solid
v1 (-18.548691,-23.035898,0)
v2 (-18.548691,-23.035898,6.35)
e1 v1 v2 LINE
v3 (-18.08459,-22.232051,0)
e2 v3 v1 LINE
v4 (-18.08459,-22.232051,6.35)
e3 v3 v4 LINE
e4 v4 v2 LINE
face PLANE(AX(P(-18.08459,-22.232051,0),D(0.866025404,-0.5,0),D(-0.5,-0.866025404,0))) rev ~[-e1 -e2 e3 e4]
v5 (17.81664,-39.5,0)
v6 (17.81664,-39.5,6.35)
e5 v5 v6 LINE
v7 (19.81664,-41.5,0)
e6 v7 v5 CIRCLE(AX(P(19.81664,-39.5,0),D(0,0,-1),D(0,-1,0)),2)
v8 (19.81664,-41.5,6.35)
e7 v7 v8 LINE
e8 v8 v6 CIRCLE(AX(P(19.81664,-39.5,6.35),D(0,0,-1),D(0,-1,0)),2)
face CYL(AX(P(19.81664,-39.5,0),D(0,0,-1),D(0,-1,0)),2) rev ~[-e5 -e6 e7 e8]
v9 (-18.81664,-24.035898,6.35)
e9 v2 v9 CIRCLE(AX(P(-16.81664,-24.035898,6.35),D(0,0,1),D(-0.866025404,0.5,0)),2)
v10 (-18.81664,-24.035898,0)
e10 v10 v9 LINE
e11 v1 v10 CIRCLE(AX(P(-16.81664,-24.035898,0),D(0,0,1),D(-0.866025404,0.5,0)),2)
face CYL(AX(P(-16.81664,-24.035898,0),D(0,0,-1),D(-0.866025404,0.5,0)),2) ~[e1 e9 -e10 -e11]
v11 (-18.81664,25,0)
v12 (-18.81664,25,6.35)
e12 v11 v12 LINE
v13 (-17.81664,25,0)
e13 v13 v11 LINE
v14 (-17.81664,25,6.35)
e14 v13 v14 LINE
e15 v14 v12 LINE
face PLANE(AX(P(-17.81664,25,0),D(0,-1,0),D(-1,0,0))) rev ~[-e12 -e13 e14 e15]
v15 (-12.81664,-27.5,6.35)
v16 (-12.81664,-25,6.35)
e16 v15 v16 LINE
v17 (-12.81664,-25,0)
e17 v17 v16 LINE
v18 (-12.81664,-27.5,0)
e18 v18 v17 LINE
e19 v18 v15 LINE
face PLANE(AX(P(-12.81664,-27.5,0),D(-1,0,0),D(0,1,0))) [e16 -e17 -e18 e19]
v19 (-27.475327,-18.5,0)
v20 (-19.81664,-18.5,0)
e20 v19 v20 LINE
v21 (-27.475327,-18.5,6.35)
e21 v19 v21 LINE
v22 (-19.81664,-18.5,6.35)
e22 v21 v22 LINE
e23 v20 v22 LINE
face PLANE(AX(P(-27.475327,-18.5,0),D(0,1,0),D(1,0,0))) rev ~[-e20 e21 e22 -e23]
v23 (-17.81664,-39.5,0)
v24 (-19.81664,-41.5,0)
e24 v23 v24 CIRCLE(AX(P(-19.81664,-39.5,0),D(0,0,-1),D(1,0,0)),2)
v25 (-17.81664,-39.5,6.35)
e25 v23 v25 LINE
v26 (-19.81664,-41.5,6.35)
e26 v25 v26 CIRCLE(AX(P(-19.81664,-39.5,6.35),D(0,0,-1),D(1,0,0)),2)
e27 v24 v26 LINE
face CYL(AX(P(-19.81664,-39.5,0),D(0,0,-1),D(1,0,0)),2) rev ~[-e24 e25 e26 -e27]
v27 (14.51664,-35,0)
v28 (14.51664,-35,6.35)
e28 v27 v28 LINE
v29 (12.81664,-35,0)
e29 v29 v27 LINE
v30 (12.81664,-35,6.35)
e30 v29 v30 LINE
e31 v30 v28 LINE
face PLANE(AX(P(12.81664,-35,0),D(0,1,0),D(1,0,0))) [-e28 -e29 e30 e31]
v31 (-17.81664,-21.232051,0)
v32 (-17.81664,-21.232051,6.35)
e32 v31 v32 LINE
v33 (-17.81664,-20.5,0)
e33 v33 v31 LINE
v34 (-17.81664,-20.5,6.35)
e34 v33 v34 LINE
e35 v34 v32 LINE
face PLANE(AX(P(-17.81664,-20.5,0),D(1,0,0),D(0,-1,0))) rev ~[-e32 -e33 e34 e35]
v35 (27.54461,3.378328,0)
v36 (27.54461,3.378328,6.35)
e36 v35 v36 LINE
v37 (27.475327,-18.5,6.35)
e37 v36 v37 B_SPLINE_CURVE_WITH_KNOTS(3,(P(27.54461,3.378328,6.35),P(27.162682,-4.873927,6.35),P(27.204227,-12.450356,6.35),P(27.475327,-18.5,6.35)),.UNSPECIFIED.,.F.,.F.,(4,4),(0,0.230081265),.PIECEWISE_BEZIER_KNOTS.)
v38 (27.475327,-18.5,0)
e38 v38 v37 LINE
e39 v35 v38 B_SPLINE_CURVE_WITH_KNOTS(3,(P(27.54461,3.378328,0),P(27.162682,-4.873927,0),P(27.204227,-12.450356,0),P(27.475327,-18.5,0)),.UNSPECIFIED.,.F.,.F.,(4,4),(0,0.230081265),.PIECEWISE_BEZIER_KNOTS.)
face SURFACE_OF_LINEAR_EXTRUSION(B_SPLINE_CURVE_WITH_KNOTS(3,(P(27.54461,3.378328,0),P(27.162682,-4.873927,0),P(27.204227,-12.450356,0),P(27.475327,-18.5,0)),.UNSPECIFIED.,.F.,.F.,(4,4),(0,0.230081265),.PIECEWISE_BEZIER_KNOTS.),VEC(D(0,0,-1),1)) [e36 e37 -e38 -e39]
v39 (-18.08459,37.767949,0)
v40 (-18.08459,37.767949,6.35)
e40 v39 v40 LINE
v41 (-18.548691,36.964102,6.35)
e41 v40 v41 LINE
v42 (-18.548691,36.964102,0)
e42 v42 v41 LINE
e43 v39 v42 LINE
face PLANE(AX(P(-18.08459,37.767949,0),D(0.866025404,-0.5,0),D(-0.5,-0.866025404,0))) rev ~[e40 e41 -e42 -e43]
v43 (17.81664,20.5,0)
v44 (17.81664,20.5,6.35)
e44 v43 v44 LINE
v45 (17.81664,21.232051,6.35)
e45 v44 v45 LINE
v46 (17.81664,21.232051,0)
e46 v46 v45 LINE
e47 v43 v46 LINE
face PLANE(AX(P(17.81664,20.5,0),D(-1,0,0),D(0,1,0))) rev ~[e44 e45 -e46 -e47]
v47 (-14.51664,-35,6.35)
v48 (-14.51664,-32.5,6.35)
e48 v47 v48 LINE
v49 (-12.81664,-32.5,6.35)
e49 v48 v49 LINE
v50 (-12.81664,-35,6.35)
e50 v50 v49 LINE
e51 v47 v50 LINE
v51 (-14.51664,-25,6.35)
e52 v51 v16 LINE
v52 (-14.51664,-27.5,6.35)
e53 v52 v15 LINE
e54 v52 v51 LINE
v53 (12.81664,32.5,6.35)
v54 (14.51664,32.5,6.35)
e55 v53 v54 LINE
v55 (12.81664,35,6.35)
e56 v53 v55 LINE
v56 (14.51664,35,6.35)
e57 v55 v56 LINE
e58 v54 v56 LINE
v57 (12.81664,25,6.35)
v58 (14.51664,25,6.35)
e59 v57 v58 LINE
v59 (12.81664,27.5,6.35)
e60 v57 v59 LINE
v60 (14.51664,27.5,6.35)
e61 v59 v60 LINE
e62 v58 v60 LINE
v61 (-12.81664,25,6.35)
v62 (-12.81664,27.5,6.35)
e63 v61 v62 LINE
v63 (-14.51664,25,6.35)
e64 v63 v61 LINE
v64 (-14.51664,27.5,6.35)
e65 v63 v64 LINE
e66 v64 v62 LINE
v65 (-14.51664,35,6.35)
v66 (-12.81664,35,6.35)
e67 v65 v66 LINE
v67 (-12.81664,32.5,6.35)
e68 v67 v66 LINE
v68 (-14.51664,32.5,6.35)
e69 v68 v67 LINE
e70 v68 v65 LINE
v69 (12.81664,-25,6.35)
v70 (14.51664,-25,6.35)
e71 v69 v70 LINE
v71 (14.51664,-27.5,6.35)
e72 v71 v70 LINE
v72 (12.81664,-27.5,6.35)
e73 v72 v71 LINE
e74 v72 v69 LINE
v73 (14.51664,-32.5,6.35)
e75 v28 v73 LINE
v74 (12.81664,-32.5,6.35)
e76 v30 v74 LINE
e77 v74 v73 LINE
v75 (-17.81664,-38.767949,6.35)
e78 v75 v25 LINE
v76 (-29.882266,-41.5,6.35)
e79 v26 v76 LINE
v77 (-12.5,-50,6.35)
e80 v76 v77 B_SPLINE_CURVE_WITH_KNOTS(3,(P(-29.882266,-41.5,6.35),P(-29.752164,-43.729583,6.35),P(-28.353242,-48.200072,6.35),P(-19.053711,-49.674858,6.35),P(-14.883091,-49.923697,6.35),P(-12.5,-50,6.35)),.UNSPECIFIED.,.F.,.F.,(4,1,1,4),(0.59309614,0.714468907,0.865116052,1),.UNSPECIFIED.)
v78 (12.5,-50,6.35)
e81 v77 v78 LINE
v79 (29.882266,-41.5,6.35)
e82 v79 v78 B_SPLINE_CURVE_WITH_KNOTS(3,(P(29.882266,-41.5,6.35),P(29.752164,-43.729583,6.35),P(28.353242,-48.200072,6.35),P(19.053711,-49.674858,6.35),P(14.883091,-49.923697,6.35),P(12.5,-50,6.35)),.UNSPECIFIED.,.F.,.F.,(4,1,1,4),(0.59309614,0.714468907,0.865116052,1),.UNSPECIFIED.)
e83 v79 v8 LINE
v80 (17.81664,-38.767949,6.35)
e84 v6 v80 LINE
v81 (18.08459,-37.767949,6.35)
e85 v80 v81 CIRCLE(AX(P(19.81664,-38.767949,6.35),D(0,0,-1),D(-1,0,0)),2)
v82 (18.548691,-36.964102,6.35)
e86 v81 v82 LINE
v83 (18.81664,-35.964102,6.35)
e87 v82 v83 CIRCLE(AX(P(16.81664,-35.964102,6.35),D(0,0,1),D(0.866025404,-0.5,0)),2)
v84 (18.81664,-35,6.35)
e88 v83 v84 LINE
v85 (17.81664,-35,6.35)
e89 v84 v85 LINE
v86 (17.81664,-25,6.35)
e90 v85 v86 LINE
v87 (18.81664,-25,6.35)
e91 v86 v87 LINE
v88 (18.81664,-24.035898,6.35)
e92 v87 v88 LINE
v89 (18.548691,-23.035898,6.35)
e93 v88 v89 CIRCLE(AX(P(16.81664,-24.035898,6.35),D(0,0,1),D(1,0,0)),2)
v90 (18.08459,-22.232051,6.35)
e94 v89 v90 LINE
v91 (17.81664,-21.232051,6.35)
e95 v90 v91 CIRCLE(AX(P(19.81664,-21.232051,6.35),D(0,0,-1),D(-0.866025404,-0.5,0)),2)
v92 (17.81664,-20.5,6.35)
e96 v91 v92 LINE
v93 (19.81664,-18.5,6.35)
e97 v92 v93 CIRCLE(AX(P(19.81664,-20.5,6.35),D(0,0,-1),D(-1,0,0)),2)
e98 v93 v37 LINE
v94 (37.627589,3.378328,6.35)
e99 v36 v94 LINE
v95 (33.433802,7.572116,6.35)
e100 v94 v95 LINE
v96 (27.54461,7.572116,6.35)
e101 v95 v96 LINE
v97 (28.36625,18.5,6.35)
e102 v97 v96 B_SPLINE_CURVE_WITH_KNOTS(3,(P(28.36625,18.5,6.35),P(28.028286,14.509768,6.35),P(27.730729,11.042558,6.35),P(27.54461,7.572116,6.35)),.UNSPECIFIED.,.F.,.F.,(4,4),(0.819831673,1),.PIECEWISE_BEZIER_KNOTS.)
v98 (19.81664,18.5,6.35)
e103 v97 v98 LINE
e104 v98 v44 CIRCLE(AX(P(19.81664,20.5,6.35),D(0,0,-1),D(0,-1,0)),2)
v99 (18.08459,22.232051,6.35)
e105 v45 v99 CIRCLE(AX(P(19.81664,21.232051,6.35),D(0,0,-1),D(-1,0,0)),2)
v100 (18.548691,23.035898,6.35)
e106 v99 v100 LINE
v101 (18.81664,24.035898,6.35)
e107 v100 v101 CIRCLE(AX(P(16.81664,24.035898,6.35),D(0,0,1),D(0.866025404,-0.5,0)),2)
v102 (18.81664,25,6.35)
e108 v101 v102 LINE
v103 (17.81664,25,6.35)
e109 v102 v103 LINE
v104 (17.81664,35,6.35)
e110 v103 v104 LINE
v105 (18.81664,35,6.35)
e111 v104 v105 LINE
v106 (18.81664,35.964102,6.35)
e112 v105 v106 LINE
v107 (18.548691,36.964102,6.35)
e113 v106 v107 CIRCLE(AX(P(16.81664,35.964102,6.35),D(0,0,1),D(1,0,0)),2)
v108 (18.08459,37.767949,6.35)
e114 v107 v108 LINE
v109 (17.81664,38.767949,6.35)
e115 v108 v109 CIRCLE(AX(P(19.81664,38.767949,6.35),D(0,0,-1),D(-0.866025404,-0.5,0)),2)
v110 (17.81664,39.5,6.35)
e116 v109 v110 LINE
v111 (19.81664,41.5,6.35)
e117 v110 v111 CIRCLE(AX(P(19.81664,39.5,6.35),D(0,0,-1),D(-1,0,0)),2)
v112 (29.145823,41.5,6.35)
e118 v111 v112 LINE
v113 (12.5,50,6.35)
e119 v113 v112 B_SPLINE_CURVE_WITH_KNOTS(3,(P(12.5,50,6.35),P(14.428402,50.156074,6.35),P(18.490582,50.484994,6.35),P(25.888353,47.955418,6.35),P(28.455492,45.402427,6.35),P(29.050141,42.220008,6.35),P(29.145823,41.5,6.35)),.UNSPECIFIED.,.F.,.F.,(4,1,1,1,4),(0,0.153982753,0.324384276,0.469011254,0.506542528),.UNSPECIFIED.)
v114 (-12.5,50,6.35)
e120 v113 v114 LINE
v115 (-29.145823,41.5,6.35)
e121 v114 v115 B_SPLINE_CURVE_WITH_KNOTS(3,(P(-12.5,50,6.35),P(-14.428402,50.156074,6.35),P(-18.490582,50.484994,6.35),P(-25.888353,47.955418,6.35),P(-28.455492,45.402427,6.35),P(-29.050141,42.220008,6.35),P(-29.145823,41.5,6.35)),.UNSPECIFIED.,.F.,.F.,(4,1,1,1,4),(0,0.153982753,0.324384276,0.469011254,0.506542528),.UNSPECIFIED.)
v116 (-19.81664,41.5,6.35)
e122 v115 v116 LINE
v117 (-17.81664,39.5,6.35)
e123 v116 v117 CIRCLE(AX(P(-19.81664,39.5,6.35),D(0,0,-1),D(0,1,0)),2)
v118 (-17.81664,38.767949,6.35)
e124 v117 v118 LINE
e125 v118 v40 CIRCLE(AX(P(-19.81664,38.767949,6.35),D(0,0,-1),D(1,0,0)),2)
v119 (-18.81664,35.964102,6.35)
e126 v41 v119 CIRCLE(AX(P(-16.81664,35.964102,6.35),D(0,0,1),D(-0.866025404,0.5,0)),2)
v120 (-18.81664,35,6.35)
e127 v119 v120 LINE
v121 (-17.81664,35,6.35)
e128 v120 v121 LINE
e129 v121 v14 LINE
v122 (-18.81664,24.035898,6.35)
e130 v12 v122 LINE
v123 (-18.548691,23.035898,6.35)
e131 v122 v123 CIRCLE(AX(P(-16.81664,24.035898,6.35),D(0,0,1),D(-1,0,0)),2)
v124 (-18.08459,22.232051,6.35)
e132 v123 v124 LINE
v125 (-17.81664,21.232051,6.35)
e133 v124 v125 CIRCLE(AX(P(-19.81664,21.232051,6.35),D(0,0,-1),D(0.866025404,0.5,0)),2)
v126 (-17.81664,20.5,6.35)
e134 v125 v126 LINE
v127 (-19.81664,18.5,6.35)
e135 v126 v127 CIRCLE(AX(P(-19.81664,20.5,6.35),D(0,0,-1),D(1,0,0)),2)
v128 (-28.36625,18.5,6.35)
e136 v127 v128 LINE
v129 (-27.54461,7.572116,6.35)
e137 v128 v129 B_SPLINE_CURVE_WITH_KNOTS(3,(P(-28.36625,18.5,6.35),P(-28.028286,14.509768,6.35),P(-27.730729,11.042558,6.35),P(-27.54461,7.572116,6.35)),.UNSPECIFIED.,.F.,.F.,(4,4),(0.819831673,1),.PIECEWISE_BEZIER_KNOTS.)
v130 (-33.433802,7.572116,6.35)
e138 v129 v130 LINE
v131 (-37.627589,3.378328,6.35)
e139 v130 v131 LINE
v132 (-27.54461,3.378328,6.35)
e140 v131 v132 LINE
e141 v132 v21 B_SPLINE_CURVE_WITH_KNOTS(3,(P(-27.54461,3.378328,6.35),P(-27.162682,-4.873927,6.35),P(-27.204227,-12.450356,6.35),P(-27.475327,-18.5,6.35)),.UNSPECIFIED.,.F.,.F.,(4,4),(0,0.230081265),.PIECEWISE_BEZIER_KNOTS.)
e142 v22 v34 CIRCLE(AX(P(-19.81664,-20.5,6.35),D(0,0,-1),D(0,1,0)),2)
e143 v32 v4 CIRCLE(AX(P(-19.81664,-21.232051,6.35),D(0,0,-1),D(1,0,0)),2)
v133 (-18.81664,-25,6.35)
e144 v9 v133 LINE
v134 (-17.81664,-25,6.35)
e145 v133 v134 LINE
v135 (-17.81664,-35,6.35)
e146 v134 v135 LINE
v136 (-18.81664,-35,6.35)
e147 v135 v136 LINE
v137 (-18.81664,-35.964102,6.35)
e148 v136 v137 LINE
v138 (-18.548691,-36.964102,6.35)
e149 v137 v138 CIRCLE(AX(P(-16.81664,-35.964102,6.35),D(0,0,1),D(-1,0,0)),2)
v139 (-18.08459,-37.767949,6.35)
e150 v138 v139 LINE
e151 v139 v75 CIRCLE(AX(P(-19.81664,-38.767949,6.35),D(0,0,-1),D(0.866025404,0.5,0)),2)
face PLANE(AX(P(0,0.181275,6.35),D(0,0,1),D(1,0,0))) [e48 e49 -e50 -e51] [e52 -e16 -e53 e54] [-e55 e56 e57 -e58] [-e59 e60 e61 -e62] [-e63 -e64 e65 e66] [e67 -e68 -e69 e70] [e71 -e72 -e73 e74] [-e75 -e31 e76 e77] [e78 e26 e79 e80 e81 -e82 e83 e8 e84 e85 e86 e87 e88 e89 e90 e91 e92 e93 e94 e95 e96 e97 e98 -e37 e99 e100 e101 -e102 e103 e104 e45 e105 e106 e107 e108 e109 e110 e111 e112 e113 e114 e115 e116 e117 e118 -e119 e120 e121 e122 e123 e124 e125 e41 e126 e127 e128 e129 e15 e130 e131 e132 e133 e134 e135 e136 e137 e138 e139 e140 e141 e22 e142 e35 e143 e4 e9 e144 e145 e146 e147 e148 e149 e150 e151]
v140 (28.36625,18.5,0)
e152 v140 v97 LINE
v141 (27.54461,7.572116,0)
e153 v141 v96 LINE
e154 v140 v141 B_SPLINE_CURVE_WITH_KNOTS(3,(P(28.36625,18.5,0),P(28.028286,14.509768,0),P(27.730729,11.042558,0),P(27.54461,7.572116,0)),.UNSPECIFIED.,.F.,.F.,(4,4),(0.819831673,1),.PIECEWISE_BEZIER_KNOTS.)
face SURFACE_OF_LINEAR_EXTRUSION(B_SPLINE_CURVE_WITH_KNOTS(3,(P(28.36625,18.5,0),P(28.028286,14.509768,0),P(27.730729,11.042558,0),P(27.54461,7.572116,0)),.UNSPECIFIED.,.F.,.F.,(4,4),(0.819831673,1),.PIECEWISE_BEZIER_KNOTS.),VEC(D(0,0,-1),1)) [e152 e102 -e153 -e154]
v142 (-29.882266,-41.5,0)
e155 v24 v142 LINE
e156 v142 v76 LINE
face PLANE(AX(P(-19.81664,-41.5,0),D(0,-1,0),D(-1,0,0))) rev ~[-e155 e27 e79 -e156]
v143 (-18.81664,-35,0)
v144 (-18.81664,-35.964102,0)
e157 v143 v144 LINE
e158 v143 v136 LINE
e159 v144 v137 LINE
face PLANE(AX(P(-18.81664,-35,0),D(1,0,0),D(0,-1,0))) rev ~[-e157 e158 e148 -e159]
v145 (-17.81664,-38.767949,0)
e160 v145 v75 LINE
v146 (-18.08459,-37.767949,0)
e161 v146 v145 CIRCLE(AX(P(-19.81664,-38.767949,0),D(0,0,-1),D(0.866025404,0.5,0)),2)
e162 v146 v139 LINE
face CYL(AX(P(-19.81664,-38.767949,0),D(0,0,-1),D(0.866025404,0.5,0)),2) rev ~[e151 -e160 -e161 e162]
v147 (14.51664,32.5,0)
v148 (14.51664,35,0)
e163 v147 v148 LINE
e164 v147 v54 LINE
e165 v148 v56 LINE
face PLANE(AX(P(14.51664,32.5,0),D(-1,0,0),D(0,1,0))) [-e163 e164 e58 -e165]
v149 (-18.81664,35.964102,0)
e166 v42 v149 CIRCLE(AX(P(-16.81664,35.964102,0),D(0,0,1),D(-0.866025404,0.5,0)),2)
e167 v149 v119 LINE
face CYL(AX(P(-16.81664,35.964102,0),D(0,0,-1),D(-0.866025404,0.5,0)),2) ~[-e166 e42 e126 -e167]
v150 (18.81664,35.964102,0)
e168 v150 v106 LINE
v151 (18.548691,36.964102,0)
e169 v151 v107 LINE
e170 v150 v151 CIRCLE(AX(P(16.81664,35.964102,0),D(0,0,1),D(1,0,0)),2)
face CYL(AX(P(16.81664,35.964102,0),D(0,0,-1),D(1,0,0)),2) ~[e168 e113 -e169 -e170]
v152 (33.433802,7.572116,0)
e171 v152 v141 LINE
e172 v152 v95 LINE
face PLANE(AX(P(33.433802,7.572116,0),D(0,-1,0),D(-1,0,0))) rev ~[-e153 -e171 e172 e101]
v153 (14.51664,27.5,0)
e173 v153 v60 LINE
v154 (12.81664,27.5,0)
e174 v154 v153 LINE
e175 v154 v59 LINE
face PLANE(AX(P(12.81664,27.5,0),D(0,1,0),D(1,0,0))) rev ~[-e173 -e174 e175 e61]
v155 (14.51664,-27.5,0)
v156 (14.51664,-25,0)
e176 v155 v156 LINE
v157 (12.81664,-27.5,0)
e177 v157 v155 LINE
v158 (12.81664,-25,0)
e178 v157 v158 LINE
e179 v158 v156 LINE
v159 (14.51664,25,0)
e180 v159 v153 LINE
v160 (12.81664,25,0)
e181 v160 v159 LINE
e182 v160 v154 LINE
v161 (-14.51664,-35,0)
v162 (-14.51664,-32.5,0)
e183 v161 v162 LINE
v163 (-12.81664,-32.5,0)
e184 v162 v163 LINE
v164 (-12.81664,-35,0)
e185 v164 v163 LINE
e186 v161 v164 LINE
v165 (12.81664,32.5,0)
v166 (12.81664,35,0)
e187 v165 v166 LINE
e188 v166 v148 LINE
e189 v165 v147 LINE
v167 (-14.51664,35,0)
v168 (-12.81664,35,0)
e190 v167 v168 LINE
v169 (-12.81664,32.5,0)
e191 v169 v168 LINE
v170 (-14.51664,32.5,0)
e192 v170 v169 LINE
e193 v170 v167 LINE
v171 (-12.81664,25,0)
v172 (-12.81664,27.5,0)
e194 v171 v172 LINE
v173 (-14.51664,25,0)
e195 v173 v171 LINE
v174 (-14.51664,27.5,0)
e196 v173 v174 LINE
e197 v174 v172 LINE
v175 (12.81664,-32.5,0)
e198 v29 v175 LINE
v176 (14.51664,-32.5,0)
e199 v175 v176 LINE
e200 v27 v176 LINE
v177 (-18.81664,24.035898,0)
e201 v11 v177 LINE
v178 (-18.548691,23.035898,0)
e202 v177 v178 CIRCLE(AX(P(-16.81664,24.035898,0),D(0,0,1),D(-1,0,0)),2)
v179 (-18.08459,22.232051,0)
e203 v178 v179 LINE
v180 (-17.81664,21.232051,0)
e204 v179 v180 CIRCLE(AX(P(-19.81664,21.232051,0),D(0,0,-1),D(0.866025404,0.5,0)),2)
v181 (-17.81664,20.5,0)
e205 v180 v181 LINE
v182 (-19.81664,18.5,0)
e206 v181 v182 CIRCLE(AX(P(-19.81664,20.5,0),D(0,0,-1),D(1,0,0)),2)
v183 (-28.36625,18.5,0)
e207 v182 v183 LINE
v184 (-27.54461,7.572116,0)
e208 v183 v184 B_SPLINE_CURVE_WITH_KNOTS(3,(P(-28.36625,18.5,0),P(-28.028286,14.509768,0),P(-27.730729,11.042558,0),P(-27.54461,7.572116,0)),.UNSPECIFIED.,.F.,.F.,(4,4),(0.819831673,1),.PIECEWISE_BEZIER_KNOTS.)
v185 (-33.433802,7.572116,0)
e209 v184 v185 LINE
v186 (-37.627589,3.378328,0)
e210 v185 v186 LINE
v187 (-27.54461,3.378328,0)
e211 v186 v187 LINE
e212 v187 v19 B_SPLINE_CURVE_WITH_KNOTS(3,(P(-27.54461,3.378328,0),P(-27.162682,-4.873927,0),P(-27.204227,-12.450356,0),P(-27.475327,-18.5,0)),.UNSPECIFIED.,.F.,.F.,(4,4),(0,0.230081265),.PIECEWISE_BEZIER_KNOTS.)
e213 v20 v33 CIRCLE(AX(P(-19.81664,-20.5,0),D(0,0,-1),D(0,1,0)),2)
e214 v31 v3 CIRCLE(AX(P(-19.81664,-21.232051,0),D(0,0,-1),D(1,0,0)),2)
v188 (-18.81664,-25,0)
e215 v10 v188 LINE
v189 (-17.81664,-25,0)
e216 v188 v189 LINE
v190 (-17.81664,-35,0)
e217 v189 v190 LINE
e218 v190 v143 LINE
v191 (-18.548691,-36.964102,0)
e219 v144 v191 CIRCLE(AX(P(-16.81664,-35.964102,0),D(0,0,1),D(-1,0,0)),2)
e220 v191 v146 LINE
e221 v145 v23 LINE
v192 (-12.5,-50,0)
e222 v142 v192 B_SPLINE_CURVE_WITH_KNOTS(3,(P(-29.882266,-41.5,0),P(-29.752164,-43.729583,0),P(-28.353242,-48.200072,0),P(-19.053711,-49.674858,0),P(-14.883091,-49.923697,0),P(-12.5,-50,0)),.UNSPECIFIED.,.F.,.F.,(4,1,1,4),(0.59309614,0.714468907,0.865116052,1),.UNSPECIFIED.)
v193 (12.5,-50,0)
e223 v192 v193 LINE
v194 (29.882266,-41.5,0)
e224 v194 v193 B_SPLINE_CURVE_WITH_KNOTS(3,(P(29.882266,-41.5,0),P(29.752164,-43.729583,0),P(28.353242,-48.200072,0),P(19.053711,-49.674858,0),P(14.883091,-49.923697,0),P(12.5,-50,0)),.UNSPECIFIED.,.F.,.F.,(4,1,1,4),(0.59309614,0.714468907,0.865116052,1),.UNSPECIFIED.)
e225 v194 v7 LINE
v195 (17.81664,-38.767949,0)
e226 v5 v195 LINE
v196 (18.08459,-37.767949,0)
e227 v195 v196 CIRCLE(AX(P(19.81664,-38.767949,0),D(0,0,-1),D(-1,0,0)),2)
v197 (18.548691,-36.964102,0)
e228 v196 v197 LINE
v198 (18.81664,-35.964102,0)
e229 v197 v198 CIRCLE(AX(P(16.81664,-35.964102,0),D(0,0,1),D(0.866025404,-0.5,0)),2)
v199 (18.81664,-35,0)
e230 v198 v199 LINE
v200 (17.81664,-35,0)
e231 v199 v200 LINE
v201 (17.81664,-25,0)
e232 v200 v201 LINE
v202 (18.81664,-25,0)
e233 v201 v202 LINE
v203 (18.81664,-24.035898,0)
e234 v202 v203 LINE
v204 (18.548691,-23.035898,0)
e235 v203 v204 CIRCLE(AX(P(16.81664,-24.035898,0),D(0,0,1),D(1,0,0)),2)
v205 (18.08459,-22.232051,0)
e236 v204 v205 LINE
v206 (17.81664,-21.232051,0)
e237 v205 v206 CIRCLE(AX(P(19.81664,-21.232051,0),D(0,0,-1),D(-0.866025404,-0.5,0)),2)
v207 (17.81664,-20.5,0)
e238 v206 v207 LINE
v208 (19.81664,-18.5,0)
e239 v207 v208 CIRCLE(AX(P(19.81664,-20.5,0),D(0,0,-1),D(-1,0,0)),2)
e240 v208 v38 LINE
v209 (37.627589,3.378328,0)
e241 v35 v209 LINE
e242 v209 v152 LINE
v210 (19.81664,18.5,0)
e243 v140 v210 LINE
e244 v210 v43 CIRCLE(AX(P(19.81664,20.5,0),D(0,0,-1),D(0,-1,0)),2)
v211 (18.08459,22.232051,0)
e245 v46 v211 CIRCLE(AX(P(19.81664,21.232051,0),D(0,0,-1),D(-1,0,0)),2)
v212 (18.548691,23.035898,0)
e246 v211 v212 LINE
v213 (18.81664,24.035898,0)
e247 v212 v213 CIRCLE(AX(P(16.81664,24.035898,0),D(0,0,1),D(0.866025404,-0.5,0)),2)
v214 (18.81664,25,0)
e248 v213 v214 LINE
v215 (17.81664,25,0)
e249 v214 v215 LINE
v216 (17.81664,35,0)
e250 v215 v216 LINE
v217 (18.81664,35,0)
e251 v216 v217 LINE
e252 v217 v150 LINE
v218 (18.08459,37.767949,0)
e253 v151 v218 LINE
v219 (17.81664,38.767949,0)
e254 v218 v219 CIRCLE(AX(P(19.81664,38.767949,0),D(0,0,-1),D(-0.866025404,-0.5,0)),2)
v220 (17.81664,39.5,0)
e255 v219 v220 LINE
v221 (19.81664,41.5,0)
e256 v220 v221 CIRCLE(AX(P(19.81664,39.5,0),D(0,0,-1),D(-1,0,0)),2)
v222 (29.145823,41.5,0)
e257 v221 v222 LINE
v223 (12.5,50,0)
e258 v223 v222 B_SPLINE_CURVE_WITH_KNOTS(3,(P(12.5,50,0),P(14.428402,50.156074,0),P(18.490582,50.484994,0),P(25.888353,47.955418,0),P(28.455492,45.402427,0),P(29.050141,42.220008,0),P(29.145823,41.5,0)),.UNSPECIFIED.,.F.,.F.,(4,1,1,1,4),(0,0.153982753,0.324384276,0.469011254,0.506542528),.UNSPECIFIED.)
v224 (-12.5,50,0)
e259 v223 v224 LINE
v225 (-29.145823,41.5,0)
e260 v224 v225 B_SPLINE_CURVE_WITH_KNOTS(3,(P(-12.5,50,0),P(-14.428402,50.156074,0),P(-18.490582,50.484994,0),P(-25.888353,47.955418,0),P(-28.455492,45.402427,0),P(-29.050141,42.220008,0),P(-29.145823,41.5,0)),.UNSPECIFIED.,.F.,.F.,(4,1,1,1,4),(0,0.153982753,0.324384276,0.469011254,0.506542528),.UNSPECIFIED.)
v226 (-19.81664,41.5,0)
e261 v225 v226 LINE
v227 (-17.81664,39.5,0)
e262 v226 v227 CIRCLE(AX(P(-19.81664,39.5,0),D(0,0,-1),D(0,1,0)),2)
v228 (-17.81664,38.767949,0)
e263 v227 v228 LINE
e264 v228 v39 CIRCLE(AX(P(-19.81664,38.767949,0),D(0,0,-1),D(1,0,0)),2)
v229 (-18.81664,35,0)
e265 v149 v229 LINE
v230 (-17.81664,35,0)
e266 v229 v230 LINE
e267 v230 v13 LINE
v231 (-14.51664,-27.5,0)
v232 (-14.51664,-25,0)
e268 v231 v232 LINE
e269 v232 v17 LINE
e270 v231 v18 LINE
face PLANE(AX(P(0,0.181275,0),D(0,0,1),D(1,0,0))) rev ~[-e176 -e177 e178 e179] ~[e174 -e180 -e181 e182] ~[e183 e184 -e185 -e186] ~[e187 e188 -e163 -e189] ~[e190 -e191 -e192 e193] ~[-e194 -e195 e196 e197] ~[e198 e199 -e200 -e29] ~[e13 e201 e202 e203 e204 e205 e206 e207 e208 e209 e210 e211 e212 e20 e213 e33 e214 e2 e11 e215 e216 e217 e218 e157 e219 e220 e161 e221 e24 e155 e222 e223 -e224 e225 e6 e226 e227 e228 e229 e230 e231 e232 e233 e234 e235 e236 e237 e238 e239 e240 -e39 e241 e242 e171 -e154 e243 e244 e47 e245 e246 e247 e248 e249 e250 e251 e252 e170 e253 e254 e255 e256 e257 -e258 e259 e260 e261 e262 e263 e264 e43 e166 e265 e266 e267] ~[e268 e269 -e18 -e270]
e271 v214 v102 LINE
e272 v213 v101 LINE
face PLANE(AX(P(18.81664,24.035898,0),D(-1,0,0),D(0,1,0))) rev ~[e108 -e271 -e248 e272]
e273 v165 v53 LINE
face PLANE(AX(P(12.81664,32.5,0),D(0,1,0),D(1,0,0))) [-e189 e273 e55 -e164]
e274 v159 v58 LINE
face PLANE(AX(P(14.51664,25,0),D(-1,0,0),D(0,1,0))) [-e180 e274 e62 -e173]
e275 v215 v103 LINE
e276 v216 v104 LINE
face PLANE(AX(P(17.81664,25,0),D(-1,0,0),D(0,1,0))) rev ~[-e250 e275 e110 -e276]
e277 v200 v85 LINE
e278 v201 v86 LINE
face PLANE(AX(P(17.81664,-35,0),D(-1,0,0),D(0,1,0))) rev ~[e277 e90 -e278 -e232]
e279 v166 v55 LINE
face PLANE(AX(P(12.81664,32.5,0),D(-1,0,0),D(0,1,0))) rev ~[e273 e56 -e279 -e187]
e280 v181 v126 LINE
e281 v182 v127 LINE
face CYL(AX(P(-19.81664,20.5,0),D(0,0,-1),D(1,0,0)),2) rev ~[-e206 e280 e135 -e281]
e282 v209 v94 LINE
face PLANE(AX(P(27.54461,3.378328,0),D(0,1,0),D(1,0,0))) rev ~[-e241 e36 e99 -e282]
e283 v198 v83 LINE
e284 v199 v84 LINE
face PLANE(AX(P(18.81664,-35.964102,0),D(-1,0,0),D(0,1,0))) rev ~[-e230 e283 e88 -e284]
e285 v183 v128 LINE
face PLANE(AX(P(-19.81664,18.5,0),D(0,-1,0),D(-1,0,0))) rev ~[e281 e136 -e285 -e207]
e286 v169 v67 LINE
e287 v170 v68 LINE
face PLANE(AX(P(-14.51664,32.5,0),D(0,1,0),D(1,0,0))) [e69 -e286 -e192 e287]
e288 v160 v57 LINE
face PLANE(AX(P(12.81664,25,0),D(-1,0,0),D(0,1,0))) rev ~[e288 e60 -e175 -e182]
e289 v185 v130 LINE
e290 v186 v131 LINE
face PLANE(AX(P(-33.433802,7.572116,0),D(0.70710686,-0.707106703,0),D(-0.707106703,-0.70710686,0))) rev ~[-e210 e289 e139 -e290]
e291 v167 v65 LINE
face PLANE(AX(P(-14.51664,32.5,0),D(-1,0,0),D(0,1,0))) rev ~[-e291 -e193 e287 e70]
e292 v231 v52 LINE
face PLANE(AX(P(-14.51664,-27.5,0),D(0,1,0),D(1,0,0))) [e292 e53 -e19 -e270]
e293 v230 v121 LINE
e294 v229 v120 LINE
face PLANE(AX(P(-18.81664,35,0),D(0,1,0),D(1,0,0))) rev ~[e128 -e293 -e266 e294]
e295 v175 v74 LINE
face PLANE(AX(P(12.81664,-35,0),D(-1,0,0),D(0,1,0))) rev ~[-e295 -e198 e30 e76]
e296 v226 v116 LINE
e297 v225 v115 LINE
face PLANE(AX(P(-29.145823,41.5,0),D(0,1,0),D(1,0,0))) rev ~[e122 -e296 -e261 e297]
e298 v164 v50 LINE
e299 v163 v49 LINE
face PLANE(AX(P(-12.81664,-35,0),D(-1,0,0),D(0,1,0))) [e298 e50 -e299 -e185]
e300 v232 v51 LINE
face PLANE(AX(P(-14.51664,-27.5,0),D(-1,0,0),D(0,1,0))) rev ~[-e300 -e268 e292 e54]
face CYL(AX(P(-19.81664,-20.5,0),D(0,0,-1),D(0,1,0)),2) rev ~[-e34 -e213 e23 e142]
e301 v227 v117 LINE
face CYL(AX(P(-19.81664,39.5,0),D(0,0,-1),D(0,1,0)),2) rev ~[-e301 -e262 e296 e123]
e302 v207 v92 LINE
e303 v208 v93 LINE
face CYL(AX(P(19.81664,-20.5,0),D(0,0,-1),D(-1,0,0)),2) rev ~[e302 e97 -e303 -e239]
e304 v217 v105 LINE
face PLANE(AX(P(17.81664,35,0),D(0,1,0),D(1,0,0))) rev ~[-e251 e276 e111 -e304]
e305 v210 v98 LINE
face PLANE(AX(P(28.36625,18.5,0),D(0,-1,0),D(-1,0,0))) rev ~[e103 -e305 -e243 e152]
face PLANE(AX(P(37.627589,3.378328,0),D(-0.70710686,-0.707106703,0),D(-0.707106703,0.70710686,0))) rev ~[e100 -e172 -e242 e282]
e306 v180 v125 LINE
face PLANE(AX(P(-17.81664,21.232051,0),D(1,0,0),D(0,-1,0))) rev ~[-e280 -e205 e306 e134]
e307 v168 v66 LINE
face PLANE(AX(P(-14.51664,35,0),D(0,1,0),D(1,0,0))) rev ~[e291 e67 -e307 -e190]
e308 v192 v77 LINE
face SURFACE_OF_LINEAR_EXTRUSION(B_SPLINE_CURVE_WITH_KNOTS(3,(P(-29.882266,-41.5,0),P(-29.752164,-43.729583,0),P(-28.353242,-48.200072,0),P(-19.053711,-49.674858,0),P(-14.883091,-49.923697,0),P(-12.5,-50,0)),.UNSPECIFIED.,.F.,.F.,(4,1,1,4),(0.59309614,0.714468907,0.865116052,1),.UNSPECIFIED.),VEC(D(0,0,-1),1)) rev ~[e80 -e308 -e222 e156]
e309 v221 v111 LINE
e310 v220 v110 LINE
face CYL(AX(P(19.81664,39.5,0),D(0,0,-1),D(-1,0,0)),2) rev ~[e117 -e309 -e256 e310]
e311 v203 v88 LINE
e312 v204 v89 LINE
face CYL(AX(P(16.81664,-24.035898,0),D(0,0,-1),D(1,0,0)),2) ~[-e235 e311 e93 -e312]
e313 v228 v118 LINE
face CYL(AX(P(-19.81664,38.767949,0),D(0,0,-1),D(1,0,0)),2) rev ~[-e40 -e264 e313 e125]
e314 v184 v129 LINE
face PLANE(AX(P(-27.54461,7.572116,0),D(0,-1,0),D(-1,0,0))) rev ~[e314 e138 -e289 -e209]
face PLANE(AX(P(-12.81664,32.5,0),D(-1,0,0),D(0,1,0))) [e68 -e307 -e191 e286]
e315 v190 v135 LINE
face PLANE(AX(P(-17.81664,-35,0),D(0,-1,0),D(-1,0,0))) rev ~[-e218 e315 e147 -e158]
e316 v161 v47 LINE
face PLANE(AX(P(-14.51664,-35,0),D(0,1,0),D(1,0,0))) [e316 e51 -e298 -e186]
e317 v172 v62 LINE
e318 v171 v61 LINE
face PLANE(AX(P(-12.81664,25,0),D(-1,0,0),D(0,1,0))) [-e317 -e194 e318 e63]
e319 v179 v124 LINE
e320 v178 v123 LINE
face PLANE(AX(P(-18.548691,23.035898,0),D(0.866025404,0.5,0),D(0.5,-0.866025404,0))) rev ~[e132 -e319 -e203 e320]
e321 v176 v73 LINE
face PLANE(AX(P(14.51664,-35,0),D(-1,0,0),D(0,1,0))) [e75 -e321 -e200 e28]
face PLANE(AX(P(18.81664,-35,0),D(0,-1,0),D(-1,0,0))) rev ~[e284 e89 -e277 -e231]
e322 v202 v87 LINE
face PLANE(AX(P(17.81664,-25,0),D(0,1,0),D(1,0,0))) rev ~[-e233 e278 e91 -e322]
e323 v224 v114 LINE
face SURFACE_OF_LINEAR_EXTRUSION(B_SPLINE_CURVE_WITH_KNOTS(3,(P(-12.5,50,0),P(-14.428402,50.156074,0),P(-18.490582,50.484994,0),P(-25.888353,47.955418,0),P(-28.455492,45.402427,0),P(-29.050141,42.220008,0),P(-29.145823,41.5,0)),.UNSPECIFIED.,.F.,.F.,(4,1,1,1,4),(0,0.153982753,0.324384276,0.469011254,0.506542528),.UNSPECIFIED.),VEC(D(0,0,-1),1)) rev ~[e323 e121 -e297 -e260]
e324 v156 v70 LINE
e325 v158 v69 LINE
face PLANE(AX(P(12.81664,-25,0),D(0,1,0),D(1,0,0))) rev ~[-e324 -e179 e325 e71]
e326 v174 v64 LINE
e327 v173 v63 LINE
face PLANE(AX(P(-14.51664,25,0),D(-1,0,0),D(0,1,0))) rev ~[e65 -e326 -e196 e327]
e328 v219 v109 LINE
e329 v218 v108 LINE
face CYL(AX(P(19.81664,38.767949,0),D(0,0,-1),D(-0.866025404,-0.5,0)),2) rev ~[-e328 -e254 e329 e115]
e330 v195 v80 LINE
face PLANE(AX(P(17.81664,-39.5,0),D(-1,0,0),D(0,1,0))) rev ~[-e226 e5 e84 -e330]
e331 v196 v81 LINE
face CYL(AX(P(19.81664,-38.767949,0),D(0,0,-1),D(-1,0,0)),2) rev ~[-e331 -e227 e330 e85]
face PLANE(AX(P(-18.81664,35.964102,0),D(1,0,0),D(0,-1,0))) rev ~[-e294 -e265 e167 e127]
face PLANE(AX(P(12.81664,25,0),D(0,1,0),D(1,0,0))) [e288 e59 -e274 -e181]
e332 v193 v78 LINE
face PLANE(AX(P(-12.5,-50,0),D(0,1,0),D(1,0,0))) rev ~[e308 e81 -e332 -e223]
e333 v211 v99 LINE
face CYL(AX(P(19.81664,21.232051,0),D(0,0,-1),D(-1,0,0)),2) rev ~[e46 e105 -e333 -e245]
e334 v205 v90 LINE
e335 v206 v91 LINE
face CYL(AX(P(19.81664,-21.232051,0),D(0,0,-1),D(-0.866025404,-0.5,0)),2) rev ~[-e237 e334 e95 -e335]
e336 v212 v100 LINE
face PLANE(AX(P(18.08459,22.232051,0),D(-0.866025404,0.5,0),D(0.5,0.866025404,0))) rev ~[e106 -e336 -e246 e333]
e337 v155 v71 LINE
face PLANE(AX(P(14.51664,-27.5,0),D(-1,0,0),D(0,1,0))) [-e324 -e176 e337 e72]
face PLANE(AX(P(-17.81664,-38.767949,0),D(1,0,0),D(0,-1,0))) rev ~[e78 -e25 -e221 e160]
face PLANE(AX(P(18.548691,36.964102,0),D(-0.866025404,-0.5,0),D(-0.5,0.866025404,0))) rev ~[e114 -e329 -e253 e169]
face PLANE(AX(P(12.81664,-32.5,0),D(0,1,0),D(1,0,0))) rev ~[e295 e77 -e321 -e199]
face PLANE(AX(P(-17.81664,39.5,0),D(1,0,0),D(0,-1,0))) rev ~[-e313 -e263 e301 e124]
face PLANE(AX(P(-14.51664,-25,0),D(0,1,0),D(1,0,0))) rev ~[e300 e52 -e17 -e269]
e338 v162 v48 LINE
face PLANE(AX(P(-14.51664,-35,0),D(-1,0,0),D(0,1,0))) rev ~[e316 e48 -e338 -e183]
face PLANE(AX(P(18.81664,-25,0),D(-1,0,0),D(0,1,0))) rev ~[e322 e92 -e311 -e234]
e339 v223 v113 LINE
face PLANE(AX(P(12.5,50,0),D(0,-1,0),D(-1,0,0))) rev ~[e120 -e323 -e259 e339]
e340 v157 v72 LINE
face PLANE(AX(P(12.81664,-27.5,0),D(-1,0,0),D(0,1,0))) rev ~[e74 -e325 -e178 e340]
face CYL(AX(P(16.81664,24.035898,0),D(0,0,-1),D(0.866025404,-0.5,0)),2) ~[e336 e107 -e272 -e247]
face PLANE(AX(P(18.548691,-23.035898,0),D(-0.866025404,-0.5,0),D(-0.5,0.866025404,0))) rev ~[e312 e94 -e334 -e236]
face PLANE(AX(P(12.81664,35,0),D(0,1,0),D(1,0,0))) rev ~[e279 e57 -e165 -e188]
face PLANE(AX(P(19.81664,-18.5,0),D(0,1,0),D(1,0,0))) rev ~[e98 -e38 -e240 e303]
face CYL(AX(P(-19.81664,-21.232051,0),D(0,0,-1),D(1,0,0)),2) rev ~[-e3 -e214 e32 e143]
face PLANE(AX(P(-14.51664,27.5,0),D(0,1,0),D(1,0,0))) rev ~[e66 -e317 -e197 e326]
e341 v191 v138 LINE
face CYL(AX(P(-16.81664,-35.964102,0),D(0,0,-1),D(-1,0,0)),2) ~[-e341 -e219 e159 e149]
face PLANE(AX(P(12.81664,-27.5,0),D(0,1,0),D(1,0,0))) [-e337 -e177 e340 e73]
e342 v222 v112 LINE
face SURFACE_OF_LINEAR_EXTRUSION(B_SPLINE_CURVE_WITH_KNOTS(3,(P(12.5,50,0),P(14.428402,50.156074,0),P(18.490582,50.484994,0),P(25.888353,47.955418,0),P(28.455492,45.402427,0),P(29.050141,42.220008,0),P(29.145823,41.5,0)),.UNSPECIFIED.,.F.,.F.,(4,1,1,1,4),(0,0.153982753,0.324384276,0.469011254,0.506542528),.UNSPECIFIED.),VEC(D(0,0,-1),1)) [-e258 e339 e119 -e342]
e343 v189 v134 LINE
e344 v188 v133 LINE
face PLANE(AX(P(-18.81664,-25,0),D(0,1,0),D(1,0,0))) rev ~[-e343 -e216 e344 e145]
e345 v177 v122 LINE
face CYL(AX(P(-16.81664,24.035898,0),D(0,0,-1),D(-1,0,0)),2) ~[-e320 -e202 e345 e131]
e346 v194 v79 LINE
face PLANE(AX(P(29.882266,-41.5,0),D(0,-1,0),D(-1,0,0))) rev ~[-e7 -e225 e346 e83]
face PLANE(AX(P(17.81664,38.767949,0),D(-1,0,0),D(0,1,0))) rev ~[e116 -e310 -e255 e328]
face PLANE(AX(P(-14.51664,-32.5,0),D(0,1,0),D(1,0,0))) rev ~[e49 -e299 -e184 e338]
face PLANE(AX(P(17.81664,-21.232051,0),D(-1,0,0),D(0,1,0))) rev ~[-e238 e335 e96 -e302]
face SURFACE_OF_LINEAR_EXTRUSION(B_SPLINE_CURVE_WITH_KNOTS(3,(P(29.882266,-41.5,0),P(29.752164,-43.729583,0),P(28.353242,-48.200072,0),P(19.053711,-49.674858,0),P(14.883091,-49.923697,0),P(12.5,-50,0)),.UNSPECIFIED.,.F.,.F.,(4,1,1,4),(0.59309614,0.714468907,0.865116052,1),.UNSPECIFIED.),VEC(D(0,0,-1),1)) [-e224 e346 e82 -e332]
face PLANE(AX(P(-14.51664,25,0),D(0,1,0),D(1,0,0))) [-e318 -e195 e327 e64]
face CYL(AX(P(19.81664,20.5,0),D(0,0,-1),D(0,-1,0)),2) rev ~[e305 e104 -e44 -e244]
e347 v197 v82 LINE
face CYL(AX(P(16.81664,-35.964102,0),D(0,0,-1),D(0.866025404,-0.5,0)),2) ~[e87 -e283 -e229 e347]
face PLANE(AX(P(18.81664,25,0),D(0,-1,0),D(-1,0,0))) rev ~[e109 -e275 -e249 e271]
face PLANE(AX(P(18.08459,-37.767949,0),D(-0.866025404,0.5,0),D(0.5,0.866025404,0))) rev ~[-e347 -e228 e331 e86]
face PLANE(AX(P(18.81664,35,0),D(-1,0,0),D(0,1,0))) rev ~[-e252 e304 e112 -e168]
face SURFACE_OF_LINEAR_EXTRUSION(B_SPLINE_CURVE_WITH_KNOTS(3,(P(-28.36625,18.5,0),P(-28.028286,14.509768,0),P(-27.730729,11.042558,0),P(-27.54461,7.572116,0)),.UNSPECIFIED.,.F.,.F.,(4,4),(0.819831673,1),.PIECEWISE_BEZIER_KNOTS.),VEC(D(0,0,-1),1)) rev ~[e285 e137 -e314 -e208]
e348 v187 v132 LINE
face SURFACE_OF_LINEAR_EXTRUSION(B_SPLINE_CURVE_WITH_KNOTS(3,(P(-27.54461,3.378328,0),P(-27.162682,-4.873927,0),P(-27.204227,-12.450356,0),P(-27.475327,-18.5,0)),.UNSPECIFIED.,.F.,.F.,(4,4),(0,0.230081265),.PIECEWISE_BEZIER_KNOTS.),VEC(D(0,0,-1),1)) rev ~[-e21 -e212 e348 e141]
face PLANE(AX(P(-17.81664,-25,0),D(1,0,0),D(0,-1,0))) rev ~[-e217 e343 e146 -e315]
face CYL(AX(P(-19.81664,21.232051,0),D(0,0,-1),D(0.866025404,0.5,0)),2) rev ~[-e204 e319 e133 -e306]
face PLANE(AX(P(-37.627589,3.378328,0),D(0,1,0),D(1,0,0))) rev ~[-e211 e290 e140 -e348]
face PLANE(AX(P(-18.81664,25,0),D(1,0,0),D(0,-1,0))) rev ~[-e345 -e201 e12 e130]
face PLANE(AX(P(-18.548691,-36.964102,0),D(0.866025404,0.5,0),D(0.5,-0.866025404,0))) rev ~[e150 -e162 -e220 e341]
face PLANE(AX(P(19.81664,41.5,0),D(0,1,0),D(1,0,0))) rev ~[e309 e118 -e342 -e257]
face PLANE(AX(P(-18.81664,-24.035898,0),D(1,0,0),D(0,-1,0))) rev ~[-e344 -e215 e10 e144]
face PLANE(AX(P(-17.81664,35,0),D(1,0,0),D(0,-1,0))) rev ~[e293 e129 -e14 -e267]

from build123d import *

# Parameters (mm, degrees)
F1_W     = 1.7
F1_H     = 2.5
F2_DEPTH = 6.35


# Not quite as in the source:
# - a feature names something its author has since deleted; it is built from what else it names


with BuildPart() as f2:
    # F1 (on Top) → F2 (new body)
    with BuildSketch(Plane.XY):
        with BuildLine():
            add(Edge.make_bspline(
                [(-28.3662502266, 18.5), (-28.0282859794, 14.509768022), (-27.7307294384, 11.0425580188), (-27.5446102023, 7.5721158646)],
                knots=[0.8198316729, 0.8198316729, 0.8198316729, 0.8198316729, 1, 1, 1, 1], degree=3))
            Line((-27.5446102023, 7.5721158646), (-33.4338024259, 7.5721158646))
            Line((-33.4338024259, 7.5721158646), (-37.6275889575, 3.3783284016))
            Line((-37.6275889575, 3.3783284016), (-27.5446102023, 3.3783284016))
            add(Edge.make_bspline(
                [(-27.5446102023, 3.3783284016), (-27.1626822342, -4.8739274421), (-27.2042266074, -12.4503556404), (-27.4753266797, -18.5)],
                knots=[0, 0, 0, 0, 0.2300812655, 0.2300812655, 0.2300812655, 0.2300812655], degree=3))
            Line((-27.4753266797, -18.5), (-19.8166404351, -18.5))
            ThreePointArc((-19.8166404351, -18.5), (-18.4024268727, -19.0857864376), (-17.8166404351, -20.5))
            Line((-17.8166404351, -20.5), (-17.8166404351, -21.2320508076))
            ThreePointArc((-17.8166404351, -21.2320508076), (-17.8847887825, -21.7496888978), (-18.0845896275, -22.2320508076))
            Line((-18.0845896275, -22.2320508076), (-18.5486912426, -23.0358983849))
            ThreePointArc((-18.5486912426, -23.0358983849), (-18.7484920877, -23.5182602947), (-18.8166404351, -24.0358983849))
            Line((-18.8166404351, -24.0358983849), (-18.8166404351, -25))
            Line((-18.8166404351, -25), (-17.8166404351, -25))
            Line((-17.8166404351, -25), (-17.8166404351, -30))
            Line((-17.8166404351, -30), (-17.8166404351, -35))
            Line((-17.8166404351, -35), (-18.8166404351, -35))
            Line((-18.8166404351, -35), (-18.8166404351, -35.9641016151))
            ThreePointArc((-18.8166404351, -35.9641016151), (-18.7484920877, -36.4817397053), (-18.5486912426, -36.9641016151))
            Line((-18.5486912426, -36.9641016151), (-18.0845896275, -37.7679491924))
            ThreePointArc((-18.0845896275, -37.7679491924), (-17.8847887825, -38.2503111022), (-17.8166404351, -38.7679491924))
            Line((-17.8166404351, -38.7679491924), (-17.8166404351, -39.5))
            ThreePointArc((-17.8166404351, -39.5), (-18.4024268727, -40.9142135624), (-19.8166404351, -41.5))
            Line((-19.8166404351, -41.5), (-29.8822661517, -41.5))
            add(Edge.make_bspline(
                [(-29.8822661517, -41.5), (-29.7521644168, -43.7295834581), (-28.3532415217, -48.2000718925), (-19.0537112462, -49.6748582384), (-14.8830911746, -49.9236971311), (-12.5, -50)],
                knots=[0.5930961397, 0.5930961397, 0.5930961397, 0.5930961397, 0.7144689073, 0.865116052, 1, 1, 1, 1], degree=3))
            Line((-12.5, -50), (12.5, -50))
            add(Edge.make_bspline(
                [(29.8822661517, -41.5), (29.7521644168, -43.7295834581), (28.3532415217, -48.2000718925), (19.0537112462, -49.6748582384), (14.8830911746, -49.9236971311), (12.5, -50)],
                knots=[0.5930961397, 0.5930961397, 0.5930961397, 0.5930961397, 0.7144689073, 0.865116052, 1, 1, 1, 1], degree=3))
            Line((29.8822661517, -41.5), (19.8166404351, -41.5))
            ThreePointArc((19.8166404351, -41.5), (18.4024268727, -40.9142135624), (17.8166404351, -39.5))
            Line((17.8166404351, -39.5), (17.8166404351, -38.7679491924))
            ThreePointArc((17.8166404351, -38.7679491924), (17.8847887825, -38.2503111022), (18.0845896275, -37.7679491924))
            Line((18.0845896275, -37.7679491924), (18.5486912426, -36.9641016151))
            ThreePointArc((18.5486912426, -36.9641016151), (18.7484920877, -36.4817397053), (18.8166404351, -35.9641016151))
            Line((18.8166404351, -35.9641016151), (18.8166404351, -35))
            Line((18.8166404351, -35), (17.8166404351, -35))
            Line((17.8166404351, -35), (17.8166404351, -30))
            Line((17.8166404351, -30), (17.8166404351, -25))
            Line((17.8166404351, -25), (18.8166404351, -25))
            Line((18.8166404351, -25), (18.8166404351, -24.0358983849))
            ThreePointArc((18.8166404351, -24.0358983849), (18.7484920877, -23.5182602947), (18.5486912426, -23.0358983849))
            Line((18.5486912426, -23.0358983849), (18.0845896275, -22.2320508076))
            ThreePointArc((18.0845896275, -22.2320508076), (17.8847887825, -21.7496888978), (17.8166404351, -21.2320508076))
            Line((17.8166404351, -21.2320508076), (17.8166404351, -20.5))
            ThreePointArc((17.8166404351, -20.5), (18.4024268727, -19.0857864376), (19.8166404351, -18.5))
            Line((19.8166404351, -18.5), (27.4753266797, -18.5))
            add(Edge.make_bspline(
                [(27.5446102023, 3.3783284016), (27.1626822342, -4.8739274421), (27.2042266074, -12.4503556404), (27.4753266797, -18.5)],
                knots=[0, 0, 0, 0, 0.2300812655, 0.2300812655, 0.2300812655, 0.2300812655], degree=3))
            Line((27.5446102023, 3.3783284016), (37.6275889575, 3.3783284016))
            Line((37.6275889575, 3.3783284016), (33.4338024259, 7.5721158646))
            Line((33.4338024259, 7.5721158646), (27.5446102023, 7.5721158646))
            add(Edge.make_bspline(
                [(28.3662502266, 18.5), (28.0282859794, 14.509768022), (27.7307294384, 11.0425580188), (27.5446102023, 7.5721158646)],
                knots=[0.8198316729, 0.8198316729, 0.8198316729, 0.8198316729, 1, 1, 1, 1], degree=3))
            Line((28.3662502266, 18.5), (19.8166404351, 18.5))
            ThreePointArc((19.8166404351, 18.5), (18.4024268727, 19.0857864376), (17.8166404351, 20.5))
            Line((17.8166404351, 20.5), (17.8166404351, 21.2320508076))
            ThreePointArc((17.8166404351, 21.2320508076), (17.8847887825, 21.7496888978), (18.0845896275, 22.2320508076))
            Line((18.0845896275, 22.2320508076), (18.5486912426, 23.0358983849))
            ThreePointArc((18.5486912426, 23.0358983849), (18.7484920877, 23.5182602947), (18.8166404351, 24.0358983849))
            Line((18.8166404351, 24.0358983849), (18.8166404351, 25))
            Line((18.8166404351, 25), (17.8166404351, 25))
            Line((17.8166404351, 25), (17.8166404351, 30))
            Line((17.8166404351, 30), (17.8166404351, 35))
            Line((17.8166404351, 35), (18.8166404351, 35))
            Line((18.8166404351, 35), (18.8166404351, 35.9641016151))
            ThreePointArc((18.8166404351, 35.9641016151), (18.7484920877, 36.4817397053), (18.5486912426, 36.9641016151))
            Line((18.5486912426, 36.9641016151), (18.0845896275, 37.7679491924))
            ThreePointArc((18.0845896275, 37.7679491924), (17.8847887825, 38.2503111022), (17.8166404351, 38.7679491924))
            Line((17.8166404351, 38.7679491924), (17.8166404351, 39.5))
            ThreePointArc((17.8166404351, 39.5), (18.4024268727, 40.9142135624), (19.8166404351, 41.5))
            Line((19.8166404351, 41.5), (29.1458233545, 41.5))
            add(Edge.make_bspline(
                [(12.5, 50), (14.4284018661, 50.1560744709), (18.4905820055, 50.4849939867), (25.8883531216, 47.9554177216), (28.4554923405, 45.4024265549), (29.0501411907, 42.2200084299), (29.1458233545, 41.5)],
                knots=[0, 0, 0, 0, 0.1539827529, 0.3243842758, 0.4690112538, 0.5065425276, 0.5065425276, 0.5065425276, 0.5065425276], degree=3))
            Line((12.5, 50), (-12.5, 50))
            add(Edge.make_bspline(
                [(-12.5, 50), (-14.4284018661, 50.1560744709), (-18.4905820055, 50.4849939867), (-25.8883531216, 47.9554177216), (-28.4554923405, 45.4024265549), (-29.0501411907, 42.2200084299), (-29.1458233545, 41.5)],
                knots=[0, 0, 0, 0, 0.1539827529, 0.3243842758, 0.4690112538, 0.5065425276, 0.5065425276, 0.5065425276, 0.5065425276], degree=3))
            Line((-29.1458233545, 41.5), (-19.8166404351, 41.5))
            ThreePointArc((-19.8166404351, 41.5), (-18.4024268727, 40.9142135624), (-17.8166404351, 39.5))
            Line((-17.8166404351, 39.5), (-17.8166404351, 38.7679491924))
            ThreePointArc((-17.8166404351, 38.7679491924), (-17.8847887825, 38.2503111022), (-18.0845896275, 37.7679491924))
            Line((-18.0845896275, 37.7679491924), (-18.5486912426, 36.9641016151))
            ThreePointArc((-18.5486912426, 36.9641016151), (-18.7484920877, 36.4817397053), (-18.8166404351, 35.9641016151))
            Line((-18.8166404351, 35.9641016151), (-18.8166404351, 35))
            Line((-18.8166404351, 35), (-17.8166404351, 35))
            Line((-17.8166404351, 35), (-17.8166404351, 30))
            Line((-17.8166404351, 30), (-17.8166404351, 25))
            Line((-17.8166404351, 25), (-18.8166404351, 25))
            Line((-18.8166404351, 25), (-18.8166404351, 24.0358983849))
            ThreePointArc((-18.8166404351, 24.0358983849), (-18.7484920877, 23.5182602947), (-18.5486912426, 23.0358983849))
            Line((-18.5486912426, 23.0358983849), (-18.0845896275, 22.2320508076))
            ThreePointArc((-18.0845896275, 22.2320508076), (-17.8847887825, 21.7496888978), (-17.8166404351, 21.2320508076))
            Line((-17.8166404351, 21.2320508076), (-17.8166404351, 20.5))
            ThreePointArc((-17.8166404351, 20.5), (-18.4024268727, 19.0857864376), (-19.8166404351, 18.5))
            Line((-19.8166404351, 18.5), (-28.3662502266, 18.5))
        make_face()
        with Locations((-13.6666404351, -33.75)):
            Rectangle(F1_W, F1_H, mode=Mode.SUBTRACT)
        with Locations((-13.6666404351, -26.25)):
            Rectangle(F1_W, F1_H, mode=Mode.SUBTRACT)
        with Locations((13.6666404351, -33.75)):
            Rectangle(F1_W, F1_H, mode=Mode.SUBTRACT)
        with Locations((13.6666404351, -26.25)):
            Rectangle(F1_W, F1_H, mode=Mode.SUBTRACT)
        with Locations((-13.6666404351, 26.25)):
            Rectangle(F1_W, F1_H, mode=Mode.SUBTRACT)
        with Locations((-13.6666404351, 33.75)):
            Rectangle(F1_W, F1_H, mode=Mode.SUBTRACT)
        with Locations((13.6666404351, 26.25)):
            Rectangle(F1_W, F1_H, mode=Mode.SUBTRACT)
        with Locations((13.6666404351, 33.75)):
            Rectangle(F1_W, F1_H, mode=Mode.SUBTRACT)
    extrude(amount=F2_DEPTH)


solid = f2.part
